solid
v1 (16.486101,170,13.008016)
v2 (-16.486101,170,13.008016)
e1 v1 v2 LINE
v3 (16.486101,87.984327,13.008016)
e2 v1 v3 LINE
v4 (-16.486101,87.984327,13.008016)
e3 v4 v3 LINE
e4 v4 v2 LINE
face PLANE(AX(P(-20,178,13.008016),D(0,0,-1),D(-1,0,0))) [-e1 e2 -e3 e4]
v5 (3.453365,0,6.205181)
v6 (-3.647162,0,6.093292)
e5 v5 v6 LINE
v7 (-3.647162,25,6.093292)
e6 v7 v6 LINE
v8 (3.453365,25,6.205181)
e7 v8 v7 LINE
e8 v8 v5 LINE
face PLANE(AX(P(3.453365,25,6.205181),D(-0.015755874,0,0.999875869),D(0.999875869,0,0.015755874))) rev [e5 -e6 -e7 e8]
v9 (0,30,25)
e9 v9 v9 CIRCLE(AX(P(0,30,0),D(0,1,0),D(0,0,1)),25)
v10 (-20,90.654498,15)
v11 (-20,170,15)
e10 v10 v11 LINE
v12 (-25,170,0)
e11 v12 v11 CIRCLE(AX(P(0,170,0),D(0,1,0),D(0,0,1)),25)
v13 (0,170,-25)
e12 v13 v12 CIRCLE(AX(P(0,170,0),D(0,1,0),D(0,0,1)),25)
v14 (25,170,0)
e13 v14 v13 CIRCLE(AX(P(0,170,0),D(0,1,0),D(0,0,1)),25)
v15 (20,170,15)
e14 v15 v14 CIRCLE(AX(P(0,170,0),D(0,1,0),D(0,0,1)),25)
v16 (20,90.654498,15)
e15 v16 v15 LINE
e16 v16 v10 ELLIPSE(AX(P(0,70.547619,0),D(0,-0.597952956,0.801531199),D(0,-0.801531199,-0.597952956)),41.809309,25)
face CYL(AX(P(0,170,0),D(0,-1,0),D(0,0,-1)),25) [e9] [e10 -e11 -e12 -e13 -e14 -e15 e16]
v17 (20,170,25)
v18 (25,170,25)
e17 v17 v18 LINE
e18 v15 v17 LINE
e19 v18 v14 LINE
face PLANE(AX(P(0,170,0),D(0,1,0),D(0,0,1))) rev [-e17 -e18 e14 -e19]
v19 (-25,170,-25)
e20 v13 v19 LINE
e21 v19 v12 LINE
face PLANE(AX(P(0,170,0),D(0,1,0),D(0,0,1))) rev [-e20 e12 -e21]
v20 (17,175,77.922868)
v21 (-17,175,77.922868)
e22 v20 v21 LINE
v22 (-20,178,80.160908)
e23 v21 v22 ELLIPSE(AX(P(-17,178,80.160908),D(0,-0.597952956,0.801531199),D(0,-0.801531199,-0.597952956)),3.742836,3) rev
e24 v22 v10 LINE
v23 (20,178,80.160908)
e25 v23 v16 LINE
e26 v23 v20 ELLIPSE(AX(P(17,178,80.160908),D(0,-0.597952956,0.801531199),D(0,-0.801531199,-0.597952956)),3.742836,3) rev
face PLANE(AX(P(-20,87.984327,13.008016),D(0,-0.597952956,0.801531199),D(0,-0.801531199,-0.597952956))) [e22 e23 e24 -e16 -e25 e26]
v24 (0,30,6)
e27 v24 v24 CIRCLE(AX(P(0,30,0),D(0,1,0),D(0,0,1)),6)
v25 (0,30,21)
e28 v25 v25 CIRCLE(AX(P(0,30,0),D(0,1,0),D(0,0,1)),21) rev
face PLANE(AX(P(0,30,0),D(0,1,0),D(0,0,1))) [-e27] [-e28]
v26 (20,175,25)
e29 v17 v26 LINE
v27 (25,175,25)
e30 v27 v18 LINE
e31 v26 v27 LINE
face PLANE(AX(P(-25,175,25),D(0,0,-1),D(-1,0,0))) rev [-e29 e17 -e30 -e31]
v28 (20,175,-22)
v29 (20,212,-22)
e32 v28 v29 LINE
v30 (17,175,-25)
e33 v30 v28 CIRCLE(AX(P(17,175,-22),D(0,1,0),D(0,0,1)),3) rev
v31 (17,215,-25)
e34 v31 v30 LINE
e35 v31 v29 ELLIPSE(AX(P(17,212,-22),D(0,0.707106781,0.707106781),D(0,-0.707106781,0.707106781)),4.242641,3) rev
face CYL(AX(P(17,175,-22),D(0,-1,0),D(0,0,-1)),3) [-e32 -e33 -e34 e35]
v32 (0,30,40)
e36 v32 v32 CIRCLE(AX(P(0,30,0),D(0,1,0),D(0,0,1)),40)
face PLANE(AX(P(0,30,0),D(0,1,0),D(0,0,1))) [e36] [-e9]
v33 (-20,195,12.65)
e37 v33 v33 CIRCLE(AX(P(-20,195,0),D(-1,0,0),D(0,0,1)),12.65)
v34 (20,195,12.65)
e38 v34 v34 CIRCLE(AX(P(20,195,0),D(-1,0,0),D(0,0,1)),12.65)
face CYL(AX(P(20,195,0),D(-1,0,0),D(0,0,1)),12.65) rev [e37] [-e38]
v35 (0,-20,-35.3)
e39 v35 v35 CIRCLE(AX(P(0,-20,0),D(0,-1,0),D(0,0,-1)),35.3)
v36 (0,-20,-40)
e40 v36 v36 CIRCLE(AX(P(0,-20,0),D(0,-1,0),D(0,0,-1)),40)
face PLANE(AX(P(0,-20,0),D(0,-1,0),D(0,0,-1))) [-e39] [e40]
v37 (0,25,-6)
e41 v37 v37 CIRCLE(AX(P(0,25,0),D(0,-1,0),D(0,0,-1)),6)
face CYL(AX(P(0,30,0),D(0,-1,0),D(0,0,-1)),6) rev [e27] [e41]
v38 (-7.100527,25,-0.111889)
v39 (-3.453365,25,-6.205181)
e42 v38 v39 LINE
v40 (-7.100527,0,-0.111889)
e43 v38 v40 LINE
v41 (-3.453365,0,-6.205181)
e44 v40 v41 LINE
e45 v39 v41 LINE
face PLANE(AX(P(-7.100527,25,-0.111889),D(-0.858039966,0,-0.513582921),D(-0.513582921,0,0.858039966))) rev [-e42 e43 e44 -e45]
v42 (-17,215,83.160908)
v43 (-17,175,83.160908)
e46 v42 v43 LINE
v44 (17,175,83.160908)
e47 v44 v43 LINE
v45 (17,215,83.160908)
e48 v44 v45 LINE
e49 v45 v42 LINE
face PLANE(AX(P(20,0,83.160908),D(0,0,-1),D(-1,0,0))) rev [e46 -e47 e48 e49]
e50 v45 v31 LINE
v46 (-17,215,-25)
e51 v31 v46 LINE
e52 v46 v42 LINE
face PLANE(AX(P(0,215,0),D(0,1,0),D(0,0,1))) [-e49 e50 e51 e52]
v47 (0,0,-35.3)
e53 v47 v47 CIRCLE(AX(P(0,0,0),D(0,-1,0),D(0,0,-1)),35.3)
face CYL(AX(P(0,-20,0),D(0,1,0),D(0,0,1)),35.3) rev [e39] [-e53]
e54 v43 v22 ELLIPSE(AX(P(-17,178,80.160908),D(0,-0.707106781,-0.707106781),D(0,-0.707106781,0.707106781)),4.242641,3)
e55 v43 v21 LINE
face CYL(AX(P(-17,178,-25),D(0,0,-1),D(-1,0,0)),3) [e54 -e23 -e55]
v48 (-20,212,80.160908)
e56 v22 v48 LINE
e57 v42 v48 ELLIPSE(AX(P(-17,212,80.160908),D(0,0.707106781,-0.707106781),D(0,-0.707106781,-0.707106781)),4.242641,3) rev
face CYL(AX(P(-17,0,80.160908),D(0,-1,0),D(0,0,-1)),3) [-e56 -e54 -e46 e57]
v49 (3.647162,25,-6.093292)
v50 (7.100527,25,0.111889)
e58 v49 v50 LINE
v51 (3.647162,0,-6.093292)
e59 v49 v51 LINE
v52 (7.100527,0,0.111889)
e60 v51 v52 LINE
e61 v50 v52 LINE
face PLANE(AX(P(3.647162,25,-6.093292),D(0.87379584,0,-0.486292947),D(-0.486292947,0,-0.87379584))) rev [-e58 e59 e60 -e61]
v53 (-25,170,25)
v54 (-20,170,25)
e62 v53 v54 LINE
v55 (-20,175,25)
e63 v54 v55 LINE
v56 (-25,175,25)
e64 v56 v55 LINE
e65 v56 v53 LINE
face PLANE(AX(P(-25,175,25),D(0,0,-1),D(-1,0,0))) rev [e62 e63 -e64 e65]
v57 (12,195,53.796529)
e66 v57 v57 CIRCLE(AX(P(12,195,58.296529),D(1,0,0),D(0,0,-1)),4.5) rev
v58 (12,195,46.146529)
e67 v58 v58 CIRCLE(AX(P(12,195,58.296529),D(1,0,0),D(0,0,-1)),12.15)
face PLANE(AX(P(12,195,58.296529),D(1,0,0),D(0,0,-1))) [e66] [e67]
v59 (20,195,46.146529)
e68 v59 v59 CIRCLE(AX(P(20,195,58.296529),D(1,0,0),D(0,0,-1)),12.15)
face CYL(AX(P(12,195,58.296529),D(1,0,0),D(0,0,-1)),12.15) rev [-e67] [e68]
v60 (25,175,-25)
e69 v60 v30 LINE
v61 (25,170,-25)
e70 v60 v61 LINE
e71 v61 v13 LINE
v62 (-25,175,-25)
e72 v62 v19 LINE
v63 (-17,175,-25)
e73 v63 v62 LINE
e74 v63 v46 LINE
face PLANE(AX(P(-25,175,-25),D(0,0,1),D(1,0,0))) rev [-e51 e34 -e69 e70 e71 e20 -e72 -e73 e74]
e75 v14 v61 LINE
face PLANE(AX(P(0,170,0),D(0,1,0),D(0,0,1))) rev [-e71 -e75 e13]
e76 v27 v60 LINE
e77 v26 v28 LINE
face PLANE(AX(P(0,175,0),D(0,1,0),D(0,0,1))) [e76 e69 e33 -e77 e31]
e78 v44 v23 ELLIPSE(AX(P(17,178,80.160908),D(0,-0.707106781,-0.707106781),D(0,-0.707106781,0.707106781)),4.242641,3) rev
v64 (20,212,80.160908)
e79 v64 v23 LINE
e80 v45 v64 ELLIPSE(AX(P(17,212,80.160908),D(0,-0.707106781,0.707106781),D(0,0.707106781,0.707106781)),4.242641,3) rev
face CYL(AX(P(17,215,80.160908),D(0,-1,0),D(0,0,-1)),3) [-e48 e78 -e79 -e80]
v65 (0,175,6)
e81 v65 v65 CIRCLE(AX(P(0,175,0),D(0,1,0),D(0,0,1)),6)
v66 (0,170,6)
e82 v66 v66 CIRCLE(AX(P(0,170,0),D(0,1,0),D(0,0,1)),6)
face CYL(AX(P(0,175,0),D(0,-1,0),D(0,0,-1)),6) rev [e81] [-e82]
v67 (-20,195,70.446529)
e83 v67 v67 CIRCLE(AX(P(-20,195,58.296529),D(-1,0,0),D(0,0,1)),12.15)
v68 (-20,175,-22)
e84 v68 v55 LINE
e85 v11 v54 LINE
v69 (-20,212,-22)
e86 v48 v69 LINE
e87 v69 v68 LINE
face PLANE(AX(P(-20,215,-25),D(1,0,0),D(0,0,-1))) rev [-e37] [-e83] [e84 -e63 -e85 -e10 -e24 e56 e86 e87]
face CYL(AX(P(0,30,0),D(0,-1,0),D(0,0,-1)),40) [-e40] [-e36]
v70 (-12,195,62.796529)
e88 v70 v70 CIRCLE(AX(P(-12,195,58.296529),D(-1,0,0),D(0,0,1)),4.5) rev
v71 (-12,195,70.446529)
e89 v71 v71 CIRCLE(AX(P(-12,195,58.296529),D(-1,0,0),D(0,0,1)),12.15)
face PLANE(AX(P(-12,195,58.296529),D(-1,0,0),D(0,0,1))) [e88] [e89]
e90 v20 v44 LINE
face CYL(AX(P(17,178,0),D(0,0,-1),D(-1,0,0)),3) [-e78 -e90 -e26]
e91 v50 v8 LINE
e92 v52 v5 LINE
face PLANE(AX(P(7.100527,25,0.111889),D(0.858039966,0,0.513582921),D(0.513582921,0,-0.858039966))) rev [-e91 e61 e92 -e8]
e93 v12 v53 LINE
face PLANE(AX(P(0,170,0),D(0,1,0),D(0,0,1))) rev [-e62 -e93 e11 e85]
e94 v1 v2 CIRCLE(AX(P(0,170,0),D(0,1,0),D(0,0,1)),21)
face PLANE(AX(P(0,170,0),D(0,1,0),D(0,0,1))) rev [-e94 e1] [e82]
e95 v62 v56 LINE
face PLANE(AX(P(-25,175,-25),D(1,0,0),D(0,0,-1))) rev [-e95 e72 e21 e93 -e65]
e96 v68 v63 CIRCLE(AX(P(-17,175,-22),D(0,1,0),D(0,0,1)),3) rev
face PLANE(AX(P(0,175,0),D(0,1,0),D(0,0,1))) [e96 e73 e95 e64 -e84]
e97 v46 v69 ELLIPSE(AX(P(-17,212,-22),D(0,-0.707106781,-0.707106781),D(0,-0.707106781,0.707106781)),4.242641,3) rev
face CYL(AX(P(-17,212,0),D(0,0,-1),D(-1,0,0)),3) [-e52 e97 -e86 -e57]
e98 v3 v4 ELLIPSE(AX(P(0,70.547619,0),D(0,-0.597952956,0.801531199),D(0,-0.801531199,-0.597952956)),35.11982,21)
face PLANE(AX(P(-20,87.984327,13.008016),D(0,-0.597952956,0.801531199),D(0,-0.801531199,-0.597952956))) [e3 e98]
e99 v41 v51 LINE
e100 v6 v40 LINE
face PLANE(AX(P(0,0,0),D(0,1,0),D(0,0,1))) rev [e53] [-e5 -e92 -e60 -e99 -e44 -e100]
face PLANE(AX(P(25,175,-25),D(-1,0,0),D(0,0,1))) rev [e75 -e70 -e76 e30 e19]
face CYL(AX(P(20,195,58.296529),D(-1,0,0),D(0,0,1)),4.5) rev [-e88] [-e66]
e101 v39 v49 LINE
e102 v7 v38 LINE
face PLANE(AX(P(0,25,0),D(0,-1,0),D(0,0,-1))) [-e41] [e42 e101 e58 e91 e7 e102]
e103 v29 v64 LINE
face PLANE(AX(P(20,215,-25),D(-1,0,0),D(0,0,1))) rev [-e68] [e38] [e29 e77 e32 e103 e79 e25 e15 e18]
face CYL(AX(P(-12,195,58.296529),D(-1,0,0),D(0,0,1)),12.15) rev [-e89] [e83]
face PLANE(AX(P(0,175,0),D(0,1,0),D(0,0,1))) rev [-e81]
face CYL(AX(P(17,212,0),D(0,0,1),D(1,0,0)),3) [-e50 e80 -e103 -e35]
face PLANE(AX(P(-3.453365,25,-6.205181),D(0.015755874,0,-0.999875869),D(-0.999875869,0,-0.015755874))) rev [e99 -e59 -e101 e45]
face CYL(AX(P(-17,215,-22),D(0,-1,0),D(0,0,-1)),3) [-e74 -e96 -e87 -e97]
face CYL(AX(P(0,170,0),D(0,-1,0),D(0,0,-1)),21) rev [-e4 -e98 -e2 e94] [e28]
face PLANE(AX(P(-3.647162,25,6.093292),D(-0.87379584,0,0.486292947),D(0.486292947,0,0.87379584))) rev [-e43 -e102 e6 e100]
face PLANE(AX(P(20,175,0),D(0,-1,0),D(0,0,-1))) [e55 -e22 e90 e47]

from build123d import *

# Parameters (mm, degrees)
CROQUIS1_R               = 40
CROQUIS1_R_2             = 6
SALIENTE_EXTRUIR1_DEPTH  = 30
SALIENTE_EXTRUIR2_START  = 20
CROQUIS2_R               = 40
CROQUIS2_R_2             = 35.3
SALIENTE_EXTRUIR2_DEPTH  = 20
CROQUIS6_R               = 6
CORTAR_EXTRUIR3_DEPTH    = 25
CROQUIS7_R               = 25
CROQUIS7_R_2             = 21
SALIENTE_EXTRUIR3_DEPTH  = 140
CROQUIS9_W               = 50
CROQUIS9_H               = 50
CROQUIS9_R               = 6
SALIENTE_EXTRUIR4_DEPTH  = 5
CROQUIS17_W              = 40
CROQUIS17_H              = 50
SALIENTE_EXTRUIR9_DEPTH  = 40
CROQUIS18_W              = 58.160908148
CROQUIS18_H              = 40
SALIENTE_EXTRUIR10_DEPTH = 40
REDONDEO1_R              = 3
CROQUIS19_R              = 12.65
CROQUIS19_R_2            = 4.5
CORTAR_EXTRUIR7_DEPTH    = 40
CROQUIS20_R              = 12.15
CORTAR_EXTRUIR8_DEPTH    = 8
CORTAR_EXTRUIR9_START    = -8
CROQUIS21_R              = 12.15
CORTAR_EXTRUIR9_DEPTH    = 8
SALIENTE_EXTRUIR11_DEPTH = 40


with BuildPart() as part:
    # Croquis1 → Saliente-Extruir1 (new body)
    with BuildSketch(Plane(origin=(0, 0, 0), x_dir=(1, 0, 0), z_dir=(0, 1, 0))):
        Circle(CROQUIS1_R)
        Circle(CROQUIS1_R_2, mode=Mode.SUBTRACT)
    extrude(amount=SALIENTE_EXTRUIR1_DEPTH)

    # Croquis2 → Saliente-Extruir2 (add)
    with BuildSketch(Plane.XZ.offset(SALIENTE_EXTRUIR2_START)):
        Circle(CROQUIS2_R)
        Circle(CROQUIS2_R_2, mode=Mode.SUBTRACT)
    extrude(amount=-SALIENTE_EXTRUIR2_DEPTH)

    # Croquis6 → Cortar-Extruir3 (cut)
    with BuildSketch(Plane.XZ):
        Polygon((-3.453364776, -6.205181039), (3.647162027, -6.093292144), (7.100526803, 0.111888895), (3.453364776, 6.205181039), (-3.647162027, 6.093292144), (-7.100526803, -0.111888895), align=None)
        Circle(CROQUIS6_R, mode=Mode.SUBTRACT)
    extrude(amount=-CORTAR_EXTRUIR3_DEPTH, mode=Mode.SUBTRACT)

    # Croquis7 → Saliente-Extruir3 (add)
    with BuildSketch(Plane(origin=(0, 30, 0), x_dir=(1, 0, 0), z_dir=(0, 1, 0))):
        Circle(CROQUIS7_R)
        Circle(CROQUIS7_R_2, mode=Mode.SUBTRACT)
    extrude(amount=SALIENTE_EXTRUIR3_DEPTH)

    # Croquis9 → Saliente-Extruir4 (add)
    with BuildSketch(Plane(origin=(0, 170, 0), x_dir=(1, 0, 0), z_dir=(0, 1, 0))):
        Rectangle(CROQUIS9_W, CROQUIS9_H)
        Circle(CROQUIS9_R, mode=Mode.SUBTRACT)
    extrude(amount=SALIENTE_EXTRUIR4_DEPTH)

    # Croquis17 → Saliente-Extruir9 (add)
    with BuildSketch(Plane(origin=(0, 175, 0), x_dir=(1, 0, 0), z_dir=(0, 1, 0))):
        Rectangle(CROQUIS17_W, CROQUIS17_H)
    extrude(amount=SALIENTE_EXTRUIR9_DEPTH)

    # Croquis18 → Saliente-Extruir10 (add)
    with BuildSketch(Plane.ZY.offset(20)):
        with Locations((54.080454074, 195)):
            Rectangle(CROQUIS18_W, CROQUIS18_H)
    extrude(amount=-SALIENTE_EXTRUIR10_DEPTH)

    # Redondeo1
    redondeo1_edges = [part.edges().sort_by_distance(p)[0] for p in [
        (-20, 175, 54.080454074),
        (-20, 195, 83.160908148),
        (-20, 215, 29.080454074),
        (-20, 195, -25),
        (20, 195, -25),
        (20, 175, 54.080454074),
        (20, 195, 83.160908148),
        (20, 215, 29.080454074),
    ]]
    fillet(redondeo1_edges, radius=REDONDEO1_R)

    # Croquis19 → Cortar-Extruir7 (cut)
    with BuildSketch(Plane.ZY.offset(20)):
        with Locations((0, 195)):
            Circle(CROQUIS19_R)
        with Locations((58.296529275, 195)):
            Circle(CROQUIS19_R_2)
    extrude(amount=-CORTAR_EXTRUIR7_DEPTH, mode=Mode.SUBTRACT)

    # Croquis20 → Cortar-Extruir8 (cut)
    with BuildSketch(Plane.ZY.offset(20)):
        with Locations((58.296529275, 195)):
            Circle(CROQUIS20_R)
    extrude(amount=-CORTAR_EXTRUIR8_DEPTH, mode=Mode.SUBTRACT)

    # Croquis21 → Cortar-Extruir9 (cut)
    with BuildSketch(Plane(origin=(20, 0, 0), x_dir=(0, 0, -1), z_dir=(1, 0, 0)).offset(CORTAR_EXTRUIR9_START)):
        with Locations((-58.296529275, 195)):
            Circle(CROQUIS21_R)
    extrude(amount=CORTAR_EXTRUIR9_DEPTH, mode=Mode.SUBTRACT)

    # Croquis22 → Saliente-Extruir11 (add)
    with BuildSketch(Plane(origin=(20, 0, 0), x_dir=(0, 0, -1), z_dir=(1, 0, 0))):
        Polygon((-80.160908148, 178), (-13.008016213, 178), (-13.008016213, 87.984326583), align=None)
    extrude(amount=-SALIENTE_EXTRUIR11_DEPTH)


solid = part.part
